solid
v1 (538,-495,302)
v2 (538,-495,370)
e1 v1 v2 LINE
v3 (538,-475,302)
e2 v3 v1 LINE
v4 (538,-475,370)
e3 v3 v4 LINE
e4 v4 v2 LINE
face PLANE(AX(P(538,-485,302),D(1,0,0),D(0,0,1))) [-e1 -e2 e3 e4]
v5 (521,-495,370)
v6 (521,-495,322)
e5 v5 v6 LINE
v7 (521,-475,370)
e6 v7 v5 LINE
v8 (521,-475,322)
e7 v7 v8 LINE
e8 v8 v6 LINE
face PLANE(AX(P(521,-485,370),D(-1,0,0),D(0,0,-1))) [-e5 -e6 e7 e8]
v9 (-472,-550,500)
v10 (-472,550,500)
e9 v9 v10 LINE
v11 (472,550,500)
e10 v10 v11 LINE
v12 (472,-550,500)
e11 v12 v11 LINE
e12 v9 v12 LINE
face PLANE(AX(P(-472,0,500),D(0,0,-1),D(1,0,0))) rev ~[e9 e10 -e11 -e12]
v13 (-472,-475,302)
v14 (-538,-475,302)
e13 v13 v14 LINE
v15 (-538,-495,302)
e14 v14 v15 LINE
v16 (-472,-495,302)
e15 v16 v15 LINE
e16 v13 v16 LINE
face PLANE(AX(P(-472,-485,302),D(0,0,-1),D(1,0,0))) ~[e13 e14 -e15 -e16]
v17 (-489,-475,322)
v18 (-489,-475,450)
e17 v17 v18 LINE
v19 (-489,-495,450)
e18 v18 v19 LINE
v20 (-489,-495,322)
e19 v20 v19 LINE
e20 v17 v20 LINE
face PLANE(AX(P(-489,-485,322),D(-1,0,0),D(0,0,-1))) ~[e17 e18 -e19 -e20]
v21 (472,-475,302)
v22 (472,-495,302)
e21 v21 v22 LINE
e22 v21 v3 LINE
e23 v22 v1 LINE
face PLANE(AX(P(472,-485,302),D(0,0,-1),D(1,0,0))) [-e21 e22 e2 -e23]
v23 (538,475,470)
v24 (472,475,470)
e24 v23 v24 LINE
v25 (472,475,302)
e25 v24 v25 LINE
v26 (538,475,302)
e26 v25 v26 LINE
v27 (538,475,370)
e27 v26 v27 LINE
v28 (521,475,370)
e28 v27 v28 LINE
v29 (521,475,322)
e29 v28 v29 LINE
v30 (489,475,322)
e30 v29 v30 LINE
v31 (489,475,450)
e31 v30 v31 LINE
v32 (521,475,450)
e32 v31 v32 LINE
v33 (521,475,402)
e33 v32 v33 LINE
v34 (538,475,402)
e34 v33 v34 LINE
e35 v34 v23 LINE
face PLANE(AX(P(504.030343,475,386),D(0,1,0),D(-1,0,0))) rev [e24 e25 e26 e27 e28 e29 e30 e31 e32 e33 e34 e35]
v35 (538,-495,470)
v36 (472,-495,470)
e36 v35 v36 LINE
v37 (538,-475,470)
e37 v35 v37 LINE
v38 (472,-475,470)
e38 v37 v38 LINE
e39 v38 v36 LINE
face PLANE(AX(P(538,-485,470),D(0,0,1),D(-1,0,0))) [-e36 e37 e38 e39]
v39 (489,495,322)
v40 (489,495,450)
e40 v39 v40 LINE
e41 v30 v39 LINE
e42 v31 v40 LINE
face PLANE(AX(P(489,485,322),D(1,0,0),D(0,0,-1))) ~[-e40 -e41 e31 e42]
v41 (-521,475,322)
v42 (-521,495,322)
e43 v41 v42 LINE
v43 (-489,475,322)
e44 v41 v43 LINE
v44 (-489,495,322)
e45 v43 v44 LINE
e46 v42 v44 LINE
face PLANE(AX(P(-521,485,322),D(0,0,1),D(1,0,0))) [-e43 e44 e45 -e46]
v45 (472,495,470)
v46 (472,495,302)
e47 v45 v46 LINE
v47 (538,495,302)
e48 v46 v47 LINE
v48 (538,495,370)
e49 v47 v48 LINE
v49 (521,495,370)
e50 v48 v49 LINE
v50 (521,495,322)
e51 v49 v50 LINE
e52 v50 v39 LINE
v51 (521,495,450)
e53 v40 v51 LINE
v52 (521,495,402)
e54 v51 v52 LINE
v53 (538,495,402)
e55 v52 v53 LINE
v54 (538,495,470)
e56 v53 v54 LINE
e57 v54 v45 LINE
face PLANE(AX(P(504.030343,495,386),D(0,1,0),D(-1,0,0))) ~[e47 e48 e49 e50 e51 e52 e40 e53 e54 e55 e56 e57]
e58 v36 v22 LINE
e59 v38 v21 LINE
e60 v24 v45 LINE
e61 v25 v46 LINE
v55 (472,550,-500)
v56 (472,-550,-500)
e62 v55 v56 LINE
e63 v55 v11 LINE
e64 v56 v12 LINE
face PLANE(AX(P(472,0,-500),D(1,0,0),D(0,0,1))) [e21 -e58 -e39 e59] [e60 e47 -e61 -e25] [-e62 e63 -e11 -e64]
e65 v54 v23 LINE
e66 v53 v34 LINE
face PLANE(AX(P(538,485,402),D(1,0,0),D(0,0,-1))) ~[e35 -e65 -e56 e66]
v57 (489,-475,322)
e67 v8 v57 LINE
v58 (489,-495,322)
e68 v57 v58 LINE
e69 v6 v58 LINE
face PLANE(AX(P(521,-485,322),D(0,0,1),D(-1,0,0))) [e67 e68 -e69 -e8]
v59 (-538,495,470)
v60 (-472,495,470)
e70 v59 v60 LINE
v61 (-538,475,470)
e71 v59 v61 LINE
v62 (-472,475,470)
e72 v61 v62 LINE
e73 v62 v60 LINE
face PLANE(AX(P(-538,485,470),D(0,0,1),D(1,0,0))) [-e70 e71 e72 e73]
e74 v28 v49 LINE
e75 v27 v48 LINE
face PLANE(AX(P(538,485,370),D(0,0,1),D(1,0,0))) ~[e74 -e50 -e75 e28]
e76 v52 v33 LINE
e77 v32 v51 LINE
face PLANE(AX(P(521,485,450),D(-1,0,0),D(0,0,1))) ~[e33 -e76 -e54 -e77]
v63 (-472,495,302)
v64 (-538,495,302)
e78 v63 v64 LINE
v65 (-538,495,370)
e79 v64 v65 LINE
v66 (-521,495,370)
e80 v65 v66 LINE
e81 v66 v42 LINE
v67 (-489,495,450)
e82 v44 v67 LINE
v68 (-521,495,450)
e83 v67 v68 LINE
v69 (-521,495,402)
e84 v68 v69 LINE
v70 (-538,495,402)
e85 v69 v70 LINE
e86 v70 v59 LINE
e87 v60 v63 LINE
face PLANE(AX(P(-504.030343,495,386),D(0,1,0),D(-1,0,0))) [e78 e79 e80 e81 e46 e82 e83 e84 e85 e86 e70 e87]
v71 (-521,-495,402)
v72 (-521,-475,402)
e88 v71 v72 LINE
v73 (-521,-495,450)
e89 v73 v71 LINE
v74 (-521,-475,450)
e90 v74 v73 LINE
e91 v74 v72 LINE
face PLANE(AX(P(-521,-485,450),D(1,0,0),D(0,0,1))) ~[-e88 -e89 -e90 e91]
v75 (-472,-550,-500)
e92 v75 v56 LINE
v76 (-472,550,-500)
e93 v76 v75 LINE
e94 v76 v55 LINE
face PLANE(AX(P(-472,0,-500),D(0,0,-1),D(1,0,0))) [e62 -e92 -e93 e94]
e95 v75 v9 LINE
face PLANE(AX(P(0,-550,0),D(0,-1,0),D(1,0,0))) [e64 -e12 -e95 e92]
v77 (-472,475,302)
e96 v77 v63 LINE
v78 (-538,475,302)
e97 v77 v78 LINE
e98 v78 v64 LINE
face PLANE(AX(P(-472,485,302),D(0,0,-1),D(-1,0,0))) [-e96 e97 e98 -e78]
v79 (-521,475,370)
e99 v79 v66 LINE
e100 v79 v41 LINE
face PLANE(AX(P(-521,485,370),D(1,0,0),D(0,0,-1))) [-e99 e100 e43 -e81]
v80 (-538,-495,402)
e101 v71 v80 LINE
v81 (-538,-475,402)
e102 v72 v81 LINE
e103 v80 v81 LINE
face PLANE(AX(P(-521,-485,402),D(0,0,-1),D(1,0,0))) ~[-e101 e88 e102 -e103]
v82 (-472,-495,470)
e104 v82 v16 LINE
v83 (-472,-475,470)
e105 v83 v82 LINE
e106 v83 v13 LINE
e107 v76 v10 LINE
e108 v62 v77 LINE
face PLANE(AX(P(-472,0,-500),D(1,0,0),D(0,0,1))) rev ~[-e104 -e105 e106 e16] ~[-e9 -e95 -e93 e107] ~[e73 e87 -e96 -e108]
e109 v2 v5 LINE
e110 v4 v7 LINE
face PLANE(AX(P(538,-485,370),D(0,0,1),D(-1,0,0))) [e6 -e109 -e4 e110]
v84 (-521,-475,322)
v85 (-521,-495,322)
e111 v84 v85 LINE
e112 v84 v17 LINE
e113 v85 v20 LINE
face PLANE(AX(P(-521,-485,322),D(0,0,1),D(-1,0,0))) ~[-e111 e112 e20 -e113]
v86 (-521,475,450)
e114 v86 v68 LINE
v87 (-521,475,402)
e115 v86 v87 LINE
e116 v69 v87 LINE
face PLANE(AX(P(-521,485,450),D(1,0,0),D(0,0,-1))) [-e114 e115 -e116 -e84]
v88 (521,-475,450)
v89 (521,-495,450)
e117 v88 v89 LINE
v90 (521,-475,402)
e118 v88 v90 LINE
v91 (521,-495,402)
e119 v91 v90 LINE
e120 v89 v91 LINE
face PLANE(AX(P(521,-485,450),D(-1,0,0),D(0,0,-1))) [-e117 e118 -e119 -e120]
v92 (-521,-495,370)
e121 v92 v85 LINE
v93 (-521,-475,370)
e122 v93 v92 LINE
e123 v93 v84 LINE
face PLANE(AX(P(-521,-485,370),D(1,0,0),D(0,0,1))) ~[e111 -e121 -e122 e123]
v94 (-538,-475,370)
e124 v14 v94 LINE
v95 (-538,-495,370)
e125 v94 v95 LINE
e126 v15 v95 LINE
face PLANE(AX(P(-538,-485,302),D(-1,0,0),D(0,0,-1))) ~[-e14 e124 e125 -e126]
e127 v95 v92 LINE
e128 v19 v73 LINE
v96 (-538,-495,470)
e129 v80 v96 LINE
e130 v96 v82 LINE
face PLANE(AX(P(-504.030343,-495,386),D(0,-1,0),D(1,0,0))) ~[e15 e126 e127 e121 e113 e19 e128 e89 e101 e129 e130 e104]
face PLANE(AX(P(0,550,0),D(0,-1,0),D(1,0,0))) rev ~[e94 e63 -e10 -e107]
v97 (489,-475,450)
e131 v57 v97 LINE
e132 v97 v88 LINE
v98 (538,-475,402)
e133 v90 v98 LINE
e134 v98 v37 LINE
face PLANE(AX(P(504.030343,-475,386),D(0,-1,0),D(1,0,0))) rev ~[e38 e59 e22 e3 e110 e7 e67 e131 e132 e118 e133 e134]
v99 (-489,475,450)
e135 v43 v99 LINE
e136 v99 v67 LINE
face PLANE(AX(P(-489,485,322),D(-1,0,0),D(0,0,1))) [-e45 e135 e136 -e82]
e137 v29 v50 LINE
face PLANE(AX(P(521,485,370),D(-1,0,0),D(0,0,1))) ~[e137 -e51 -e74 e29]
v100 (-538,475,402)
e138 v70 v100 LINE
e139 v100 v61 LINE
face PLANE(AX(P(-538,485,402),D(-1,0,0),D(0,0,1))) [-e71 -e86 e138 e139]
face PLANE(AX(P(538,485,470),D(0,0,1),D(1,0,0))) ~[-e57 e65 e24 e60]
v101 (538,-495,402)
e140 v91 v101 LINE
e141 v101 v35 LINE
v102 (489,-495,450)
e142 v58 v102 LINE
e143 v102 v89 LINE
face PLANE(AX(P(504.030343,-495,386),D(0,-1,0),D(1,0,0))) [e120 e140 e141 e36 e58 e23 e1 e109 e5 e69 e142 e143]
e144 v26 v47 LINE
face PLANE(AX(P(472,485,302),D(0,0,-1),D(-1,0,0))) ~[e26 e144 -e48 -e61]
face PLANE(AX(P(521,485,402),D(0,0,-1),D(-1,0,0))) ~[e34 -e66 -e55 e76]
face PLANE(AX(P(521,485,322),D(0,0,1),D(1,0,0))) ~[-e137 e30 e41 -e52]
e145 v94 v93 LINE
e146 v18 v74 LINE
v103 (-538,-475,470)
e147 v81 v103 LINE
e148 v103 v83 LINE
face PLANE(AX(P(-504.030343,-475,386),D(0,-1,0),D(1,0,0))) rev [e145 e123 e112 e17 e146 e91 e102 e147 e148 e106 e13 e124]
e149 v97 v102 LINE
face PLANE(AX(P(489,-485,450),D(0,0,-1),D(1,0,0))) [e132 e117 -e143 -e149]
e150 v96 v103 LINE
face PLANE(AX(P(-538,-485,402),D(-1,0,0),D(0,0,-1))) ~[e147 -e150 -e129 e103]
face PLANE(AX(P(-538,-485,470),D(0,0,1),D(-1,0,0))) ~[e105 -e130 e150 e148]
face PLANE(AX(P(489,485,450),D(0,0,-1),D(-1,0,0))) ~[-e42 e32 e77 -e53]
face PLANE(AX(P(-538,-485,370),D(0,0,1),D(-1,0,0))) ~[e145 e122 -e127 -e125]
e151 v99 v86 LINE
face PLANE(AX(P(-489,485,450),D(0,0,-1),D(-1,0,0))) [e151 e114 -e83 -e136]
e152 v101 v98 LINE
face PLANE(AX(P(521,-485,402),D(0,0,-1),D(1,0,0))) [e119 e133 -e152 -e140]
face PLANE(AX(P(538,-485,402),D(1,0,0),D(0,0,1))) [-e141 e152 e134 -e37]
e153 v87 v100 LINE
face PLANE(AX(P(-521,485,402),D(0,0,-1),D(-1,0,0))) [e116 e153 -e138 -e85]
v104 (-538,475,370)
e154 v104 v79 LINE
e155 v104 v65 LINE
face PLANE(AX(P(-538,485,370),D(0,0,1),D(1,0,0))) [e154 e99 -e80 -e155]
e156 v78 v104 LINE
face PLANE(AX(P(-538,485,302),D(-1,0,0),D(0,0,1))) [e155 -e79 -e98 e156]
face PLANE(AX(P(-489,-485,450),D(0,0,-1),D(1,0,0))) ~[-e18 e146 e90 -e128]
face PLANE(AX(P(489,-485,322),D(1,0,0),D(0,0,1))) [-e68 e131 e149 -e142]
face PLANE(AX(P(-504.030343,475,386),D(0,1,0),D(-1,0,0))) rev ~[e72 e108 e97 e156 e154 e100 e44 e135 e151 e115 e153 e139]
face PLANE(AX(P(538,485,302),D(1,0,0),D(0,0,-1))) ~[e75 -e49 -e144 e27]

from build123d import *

# Parameters (mm, degrees)
F0_W             = 944
F0_H             = 1000
F1_DEPTH         = 550
F4_DEPTH         = 10
F4_COPIES2_COUNT = 2


# Not quite as in the source:
# - a pattern or mirror of a feature is missing from the dataset's text; its kind, count and spacing are read off the source's solid


with BuildPart() as f1:
    # F0 (on Front) → F1 (new body, symmetric)
    with BuildSketch(Plane.XZ):
        Rectangle(F0_W, F0_H)
    extrude(amount=F1_DEPTH, both=True)

    # F3 (on offset) → F4 (join, symmetric)
    with BuildSketch(Plane.XZ.offset(485)):
        Polygon((538, 470), (472, 470), (472, 302), (538, 302), (538, 370), (521, 370), (521, 322), (489, 322), (489, 450), (521, 450), (521, 402), (538, 402), align=None)
    f4 = extrude(amount=F4_DEPTH, both=True)

    # F4_copies: F4 across plane
    add(f4.mirror(Plane.ZX))

    # F4_copies1: F4 across plane
    add(f4.mirror(Plane(origin=(0, 0, 0), x_dir=(0, 0, -1), z_dir=(-1, 0, 0))))

    # F4_copies2: F4 ×2 about axis
    f4_copies2_axis = Axis((0, 0, 0), (0, 0, 1))
    for i in range(1, F4_COPIES2_COUNT):
        add(f4.rotate(f4_copies2_axis, i * 360 / F4_COPIES2_COUNT))


solid = f1.part
